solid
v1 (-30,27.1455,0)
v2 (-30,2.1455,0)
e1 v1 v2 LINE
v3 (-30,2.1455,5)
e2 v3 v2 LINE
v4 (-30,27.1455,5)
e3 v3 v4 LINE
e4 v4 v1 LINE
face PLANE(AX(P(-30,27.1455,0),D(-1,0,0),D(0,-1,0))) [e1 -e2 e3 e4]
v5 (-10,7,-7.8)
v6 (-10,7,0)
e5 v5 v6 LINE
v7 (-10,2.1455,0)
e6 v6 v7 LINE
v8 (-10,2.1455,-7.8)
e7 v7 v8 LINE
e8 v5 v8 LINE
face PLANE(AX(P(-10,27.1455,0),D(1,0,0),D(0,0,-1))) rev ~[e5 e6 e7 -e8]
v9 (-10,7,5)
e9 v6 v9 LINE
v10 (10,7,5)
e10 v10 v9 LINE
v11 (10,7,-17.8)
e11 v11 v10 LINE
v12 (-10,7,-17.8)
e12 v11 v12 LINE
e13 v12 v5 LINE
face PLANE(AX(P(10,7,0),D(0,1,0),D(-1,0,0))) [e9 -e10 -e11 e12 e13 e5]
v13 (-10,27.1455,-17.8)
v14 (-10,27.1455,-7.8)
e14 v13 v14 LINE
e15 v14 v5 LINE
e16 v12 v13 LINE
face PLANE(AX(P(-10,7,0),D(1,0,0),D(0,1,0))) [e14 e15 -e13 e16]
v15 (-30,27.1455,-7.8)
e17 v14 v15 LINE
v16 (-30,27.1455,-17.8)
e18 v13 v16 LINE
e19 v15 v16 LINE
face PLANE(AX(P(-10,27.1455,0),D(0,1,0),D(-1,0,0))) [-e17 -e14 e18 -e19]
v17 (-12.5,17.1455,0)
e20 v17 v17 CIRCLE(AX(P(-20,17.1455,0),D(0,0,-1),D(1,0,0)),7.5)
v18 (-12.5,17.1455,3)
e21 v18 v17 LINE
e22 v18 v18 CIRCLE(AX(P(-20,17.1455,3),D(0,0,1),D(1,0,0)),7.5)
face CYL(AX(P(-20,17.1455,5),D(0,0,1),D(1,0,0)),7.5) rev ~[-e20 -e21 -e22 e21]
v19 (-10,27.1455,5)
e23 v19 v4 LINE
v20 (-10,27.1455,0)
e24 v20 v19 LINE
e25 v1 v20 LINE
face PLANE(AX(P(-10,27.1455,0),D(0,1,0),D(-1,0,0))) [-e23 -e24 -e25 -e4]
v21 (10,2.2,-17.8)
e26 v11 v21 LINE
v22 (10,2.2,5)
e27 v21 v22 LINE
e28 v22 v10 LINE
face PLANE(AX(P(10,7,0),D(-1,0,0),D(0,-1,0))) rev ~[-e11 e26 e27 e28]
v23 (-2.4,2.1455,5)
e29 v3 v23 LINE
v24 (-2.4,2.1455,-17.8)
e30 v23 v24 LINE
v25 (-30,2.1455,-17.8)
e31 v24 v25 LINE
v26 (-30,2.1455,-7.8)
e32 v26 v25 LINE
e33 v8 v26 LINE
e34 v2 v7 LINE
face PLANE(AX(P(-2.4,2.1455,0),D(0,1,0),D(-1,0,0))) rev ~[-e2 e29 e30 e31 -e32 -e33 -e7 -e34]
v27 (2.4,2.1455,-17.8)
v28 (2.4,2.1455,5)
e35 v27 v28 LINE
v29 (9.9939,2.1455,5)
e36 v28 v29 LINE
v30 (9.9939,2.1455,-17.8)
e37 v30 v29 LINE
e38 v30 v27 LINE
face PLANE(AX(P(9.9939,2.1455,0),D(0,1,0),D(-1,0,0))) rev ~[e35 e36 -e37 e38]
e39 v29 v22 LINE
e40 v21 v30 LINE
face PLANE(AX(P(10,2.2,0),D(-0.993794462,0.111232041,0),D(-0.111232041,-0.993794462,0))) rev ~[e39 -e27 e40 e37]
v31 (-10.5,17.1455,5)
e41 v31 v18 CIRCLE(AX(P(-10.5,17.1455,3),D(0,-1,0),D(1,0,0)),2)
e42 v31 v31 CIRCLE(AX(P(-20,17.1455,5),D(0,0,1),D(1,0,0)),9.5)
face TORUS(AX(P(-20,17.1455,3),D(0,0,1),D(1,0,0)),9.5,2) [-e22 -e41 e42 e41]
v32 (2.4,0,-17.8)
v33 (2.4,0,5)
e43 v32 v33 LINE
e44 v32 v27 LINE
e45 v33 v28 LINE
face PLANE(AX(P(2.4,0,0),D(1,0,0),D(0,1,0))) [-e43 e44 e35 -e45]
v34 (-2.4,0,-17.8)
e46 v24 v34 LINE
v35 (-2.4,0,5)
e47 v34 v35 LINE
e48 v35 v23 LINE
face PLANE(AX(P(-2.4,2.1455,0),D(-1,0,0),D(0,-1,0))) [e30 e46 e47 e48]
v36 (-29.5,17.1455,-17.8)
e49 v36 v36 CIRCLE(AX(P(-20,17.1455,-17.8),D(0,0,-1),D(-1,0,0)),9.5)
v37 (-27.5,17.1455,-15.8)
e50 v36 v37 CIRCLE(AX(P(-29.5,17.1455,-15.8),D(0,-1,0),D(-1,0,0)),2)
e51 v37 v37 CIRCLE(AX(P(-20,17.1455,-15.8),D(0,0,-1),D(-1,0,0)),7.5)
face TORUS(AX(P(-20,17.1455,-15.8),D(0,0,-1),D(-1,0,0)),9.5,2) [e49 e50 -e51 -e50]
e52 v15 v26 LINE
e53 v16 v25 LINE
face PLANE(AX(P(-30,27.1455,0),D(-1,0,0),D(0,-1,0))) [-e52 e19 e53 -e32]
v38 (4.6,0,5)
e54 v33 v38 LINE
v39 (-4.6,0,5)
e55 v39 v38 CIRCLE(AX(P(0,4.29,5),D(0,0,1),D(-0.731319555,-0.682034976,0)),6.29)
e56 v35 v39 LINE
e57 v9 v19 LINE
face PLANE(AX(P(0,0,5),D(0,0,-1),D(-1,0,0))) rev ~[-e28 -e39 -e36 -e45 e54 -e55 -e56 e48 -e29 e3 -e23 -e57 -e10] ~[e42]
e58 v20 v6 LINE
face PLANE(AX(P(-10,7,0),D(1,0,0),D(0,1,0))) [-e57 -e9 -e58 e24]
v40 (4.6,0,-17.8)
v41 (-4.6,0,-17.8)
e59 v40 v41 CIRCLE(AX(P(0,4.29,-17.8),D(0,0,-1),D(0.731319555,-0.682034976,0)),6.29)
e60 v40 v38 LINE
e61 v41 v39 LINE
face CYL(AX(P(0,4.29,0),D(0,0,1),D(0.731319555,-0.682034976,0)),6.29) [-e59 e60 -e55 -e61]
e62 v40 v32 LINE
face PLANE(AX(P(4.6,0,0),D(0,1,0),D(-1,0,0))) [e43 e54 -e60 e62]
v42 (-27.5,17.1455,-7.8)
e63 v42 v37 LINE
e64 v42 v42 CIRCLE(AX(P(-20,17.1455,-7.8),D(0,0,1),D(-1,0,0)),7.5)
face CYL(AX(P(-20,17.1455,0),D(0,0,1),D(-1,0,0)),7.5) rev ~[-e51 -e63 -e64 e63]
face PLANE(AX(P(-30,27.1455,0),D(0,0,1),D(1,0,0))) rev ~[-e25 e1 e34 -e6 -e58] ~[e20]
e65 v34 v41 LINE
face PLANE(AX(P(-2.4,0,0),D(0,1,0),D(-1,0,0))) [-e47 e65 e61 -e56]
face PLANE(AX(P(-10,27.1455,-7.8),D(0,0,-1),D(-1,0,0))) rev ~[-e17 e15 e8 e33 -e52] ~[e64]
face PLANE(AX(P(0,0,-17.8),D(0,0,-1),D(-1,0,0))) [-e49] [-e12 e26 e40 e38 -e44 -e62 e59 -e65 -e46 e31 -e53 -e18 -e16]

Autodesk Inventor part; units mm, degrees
ref_plane "YZ Plane" through (0, 0, 0) normal (1, 0, 0) x (0, 1, 0)
ref_plane "XZ Plane" through (0, 0, 0) normal (0, 1, 0) x (-1, 0, 0)
ref_plane "XY Plane" through (0, 0, 0) normal (0, 0, 1) x (1, 0, 0)
sketch "Skizze2" plane through (0, 0, 0) normal (0, 0, 1) x (1, 0, 0)
  line L0 (2.4, 0) -> (2.4, 7)
  line L1 (-2.4, 0) -> (-2.4, 7)
  line L2 (0, 0) -> (2.4, 0) construction
  line L3 (-2.4, 7) -> (2.4, 7)
  line L4 (-2.4, 0) -> (-4.6, 0)
  line L5 (2.4, 0) -> (4.6, 0)
  arc A0 (-4.6, 0) -> (4.6, 0) centre (0, 4.29) ccw
  point P0 (0, -2)
  dimension "d0" = 7
  dimension "d1" = 4.8
  dimension "d2" = 2.4
  dimension "d3" = 2.2
  dimension "d4" = 2
extrude "Extrusion1" add sketch "Skizze2" along normal blind 5
sketch "Skizze3" plane through (0, 0, 5) normal (0, 0, 1) x (1, 0, 0)
  line L0 (-2.4, 0) -> (-2.4, 2.2) construction
  line L1 (-2.4, 2.2) -> (-10, 2.2)
  line L2 (-2.4, 2.2) -> (10, 2.2)
  line L3 (-10, 2.2) -> (10, 2.2)
  line L4 (10, 2.2) -> (10, 7)
  line L5 (10, 7) -> (-10, 7)
  line L6 (-10, 7) -> (-10, 2.2)
  point P0 (0, 0)
  point P1 (2.4, 7)
  dimension "d7" = 2.2
  dimension "d8" = 20
  dimension "d9" = 10
  dimension "d10" = 20
extrude "Extrusion2" add sketch "Skizze3" against normal blind 5
sketch "Skizze5" plane through (-10, 2.2, 5) normal (-1, 0, 0) x (0, 0, 1)
  line L0 (0, 4.8) -> (-5, 4.8) projected
  line L1 (-5, 4.8) -> (0, 4.8)
  line L2 (0, 4.8) -> (0, -0.0545)
  line L3 (0, -0.0545) -> (-5, -0.0545)
  line L4 (-5, -0.0545) -> (-5, 4.8)
  point P0 (-5, -2.2)
extrude "Extrusion3" add sketch "Skizze5" along normal blind 5
sketch "Skizze6" plane through (-10, 2.1455, 0) normal (0, -1, 0) x (1, 0, 0)
  line L0 (0, 5) -> (7.6, 5) projected
  line L1 (0, 5) -> (-5, 5) projected
  line L2 (0, 5) -> (-5, 5)
  line L3 (-5, 5) -> (-5, 0)
  line L4 (-5, 0) -> (0, 0)
  line L5 (0, 0) -> (0, 5)
  point P0 (10, 0)
extrude "Extrusion4" add sketch "Skizze6" against normal blind 25
sketch "Skizze12" plane through (-15, 2.2, 5) normal (-1, 0, 0) x (0, 0, 1)
  line L0 (0, -0.0545) -> (0, 24.9455) projected
  line L1 (-5, -0.0545) -> (-5, 24.9455) projected
  line L2 (0, -0.0545) -> (-5, -0.0545)
  line L3 (-5, -0.0545) -> (-5, 24.9455)
  line L4 (-5, 24.9455) -> (0, 24.9455)
  line L5 (0, 24.9455) -> (0, -0.0545)
  point P0 (-5, -2.2)
extrude "Extrusion9" add sketch "Skizze12" along normal blind 15
sketch "Skizze13" plane through (0, 0, 5) normal (0, 0, 1) x (1, 0, 0)
  circle A0 centre (-20, 17.1455) radius 7.5
  line L0 (-10, 27.1455) -> (-30, 27.1455) projected
  line L1 (-30, 2.1455) -> (-30, 27.1455) projected
  point P0 (0, 0)
  point P1 (-20, 27.1455)
  dimension "d31" = 15
  dimension "d32" = 10
  dimension "d33" = 10
extrude "Extrusion10" cut sketch "Skizze13" against normal blind 15
sketch "Skizze14" plane through (0, 0, 0) normal (0, 0, -1) x (-1, 0, 0)
  line L0 (10, 2.2) -> (10, 2.1455) projected
  line L1 (10, 2.2) -> (10, 2.1455)
  line L2 (10, 2.1455) -> (-9.9939, 2.1455)
  line L3 (-10, 2.2) -> (-2.4, 2.2) projected
  line L4 (-9.9939, 2.1455) -> (-10, 2.2)
  line L5 (-10, 2.2) -> (10, 2.2)
  point P0 (0, 0)
extrude "Extrusion11" add sketch "Skizze14" against normal blind 5
sketch "Skizze16" plane through (0, 0, 0) normal (0, 0, -1) x (-1, 0, 0)
  line L0 (2.4, 2.1455) -> (30, 2.1455) projected
  line L1 (30, 27.1455) -> (30, 2.1455) projected
  line L2 (10, 27.1455) -> (30, 27.1455) projected
  line L3 (10, 7) -> (10, 27.1455) projected
  line L4 (-10, 7) -> (10, 7) projected
  line L5 (-10, 7) -> (-10, 2.2) projected
  line L6 (-10, 2.2) -> (-9.9939, 2.1455) projected
  line L7 (-9.9939, 2.1455) -> (-2.4, 2.1455) projected
  line L8 (-2.4, 0) -> (-2.4, 2.1455) projected
  line L9 (-4.6, 0) -> (-2.4, 0) projected
  arc A0 (-4.6, 0) -> (4.6, 0) centre (0, 4.29) ccw projected
  line L10 (2.4, 0) -> (4.6, 0) projected
  line L11 (2.4, 2.1455) -> (2.4, 0) projected
  circle A1 centre (20, 17.1455) radius 7.5 projected
  point P0 (0, 0)
extrude "Extrusion12" add sketch "Skizze16" along normal blind 17.8
sketch "Skizze17" plane through (-10, 27.1455, 0) normal (0, 1, 0) x (1, 0, 0)
  line L0 (0, -5) -> (-20, -5) projected
  line L1 (0, -5) -> (0, 17.8) projected
  line L2 (-20, 17.8) -> (0, 17.8) projected
  line L3 (-20, -5) -> (-20, 17.8) projected
  line L4 (0, 7.8) -> (-20, 7.8)
  line L5 (-20, -5) -> (-20, 17.8) projected
  line L6 (-20, 7.8) -> (-20, 0)
  line L7 (-20, 0) -> (0, 0)
  line L8 (0, 7.8) -> (0, 0)
  point P0 (10, 0)
  dimension "d41" = 10
  dimension "d42" = 7.8
extrude "Extrusion13" cut sketch "Skizze17" against normal through all contours L7 L3 L4 L1
fillet "Rundung3" radius 2 2 edges at (-27.5, 17.1455, 5) (-12.5, 17.1455, -17.8)
properties part number "Connector MiniTec"
